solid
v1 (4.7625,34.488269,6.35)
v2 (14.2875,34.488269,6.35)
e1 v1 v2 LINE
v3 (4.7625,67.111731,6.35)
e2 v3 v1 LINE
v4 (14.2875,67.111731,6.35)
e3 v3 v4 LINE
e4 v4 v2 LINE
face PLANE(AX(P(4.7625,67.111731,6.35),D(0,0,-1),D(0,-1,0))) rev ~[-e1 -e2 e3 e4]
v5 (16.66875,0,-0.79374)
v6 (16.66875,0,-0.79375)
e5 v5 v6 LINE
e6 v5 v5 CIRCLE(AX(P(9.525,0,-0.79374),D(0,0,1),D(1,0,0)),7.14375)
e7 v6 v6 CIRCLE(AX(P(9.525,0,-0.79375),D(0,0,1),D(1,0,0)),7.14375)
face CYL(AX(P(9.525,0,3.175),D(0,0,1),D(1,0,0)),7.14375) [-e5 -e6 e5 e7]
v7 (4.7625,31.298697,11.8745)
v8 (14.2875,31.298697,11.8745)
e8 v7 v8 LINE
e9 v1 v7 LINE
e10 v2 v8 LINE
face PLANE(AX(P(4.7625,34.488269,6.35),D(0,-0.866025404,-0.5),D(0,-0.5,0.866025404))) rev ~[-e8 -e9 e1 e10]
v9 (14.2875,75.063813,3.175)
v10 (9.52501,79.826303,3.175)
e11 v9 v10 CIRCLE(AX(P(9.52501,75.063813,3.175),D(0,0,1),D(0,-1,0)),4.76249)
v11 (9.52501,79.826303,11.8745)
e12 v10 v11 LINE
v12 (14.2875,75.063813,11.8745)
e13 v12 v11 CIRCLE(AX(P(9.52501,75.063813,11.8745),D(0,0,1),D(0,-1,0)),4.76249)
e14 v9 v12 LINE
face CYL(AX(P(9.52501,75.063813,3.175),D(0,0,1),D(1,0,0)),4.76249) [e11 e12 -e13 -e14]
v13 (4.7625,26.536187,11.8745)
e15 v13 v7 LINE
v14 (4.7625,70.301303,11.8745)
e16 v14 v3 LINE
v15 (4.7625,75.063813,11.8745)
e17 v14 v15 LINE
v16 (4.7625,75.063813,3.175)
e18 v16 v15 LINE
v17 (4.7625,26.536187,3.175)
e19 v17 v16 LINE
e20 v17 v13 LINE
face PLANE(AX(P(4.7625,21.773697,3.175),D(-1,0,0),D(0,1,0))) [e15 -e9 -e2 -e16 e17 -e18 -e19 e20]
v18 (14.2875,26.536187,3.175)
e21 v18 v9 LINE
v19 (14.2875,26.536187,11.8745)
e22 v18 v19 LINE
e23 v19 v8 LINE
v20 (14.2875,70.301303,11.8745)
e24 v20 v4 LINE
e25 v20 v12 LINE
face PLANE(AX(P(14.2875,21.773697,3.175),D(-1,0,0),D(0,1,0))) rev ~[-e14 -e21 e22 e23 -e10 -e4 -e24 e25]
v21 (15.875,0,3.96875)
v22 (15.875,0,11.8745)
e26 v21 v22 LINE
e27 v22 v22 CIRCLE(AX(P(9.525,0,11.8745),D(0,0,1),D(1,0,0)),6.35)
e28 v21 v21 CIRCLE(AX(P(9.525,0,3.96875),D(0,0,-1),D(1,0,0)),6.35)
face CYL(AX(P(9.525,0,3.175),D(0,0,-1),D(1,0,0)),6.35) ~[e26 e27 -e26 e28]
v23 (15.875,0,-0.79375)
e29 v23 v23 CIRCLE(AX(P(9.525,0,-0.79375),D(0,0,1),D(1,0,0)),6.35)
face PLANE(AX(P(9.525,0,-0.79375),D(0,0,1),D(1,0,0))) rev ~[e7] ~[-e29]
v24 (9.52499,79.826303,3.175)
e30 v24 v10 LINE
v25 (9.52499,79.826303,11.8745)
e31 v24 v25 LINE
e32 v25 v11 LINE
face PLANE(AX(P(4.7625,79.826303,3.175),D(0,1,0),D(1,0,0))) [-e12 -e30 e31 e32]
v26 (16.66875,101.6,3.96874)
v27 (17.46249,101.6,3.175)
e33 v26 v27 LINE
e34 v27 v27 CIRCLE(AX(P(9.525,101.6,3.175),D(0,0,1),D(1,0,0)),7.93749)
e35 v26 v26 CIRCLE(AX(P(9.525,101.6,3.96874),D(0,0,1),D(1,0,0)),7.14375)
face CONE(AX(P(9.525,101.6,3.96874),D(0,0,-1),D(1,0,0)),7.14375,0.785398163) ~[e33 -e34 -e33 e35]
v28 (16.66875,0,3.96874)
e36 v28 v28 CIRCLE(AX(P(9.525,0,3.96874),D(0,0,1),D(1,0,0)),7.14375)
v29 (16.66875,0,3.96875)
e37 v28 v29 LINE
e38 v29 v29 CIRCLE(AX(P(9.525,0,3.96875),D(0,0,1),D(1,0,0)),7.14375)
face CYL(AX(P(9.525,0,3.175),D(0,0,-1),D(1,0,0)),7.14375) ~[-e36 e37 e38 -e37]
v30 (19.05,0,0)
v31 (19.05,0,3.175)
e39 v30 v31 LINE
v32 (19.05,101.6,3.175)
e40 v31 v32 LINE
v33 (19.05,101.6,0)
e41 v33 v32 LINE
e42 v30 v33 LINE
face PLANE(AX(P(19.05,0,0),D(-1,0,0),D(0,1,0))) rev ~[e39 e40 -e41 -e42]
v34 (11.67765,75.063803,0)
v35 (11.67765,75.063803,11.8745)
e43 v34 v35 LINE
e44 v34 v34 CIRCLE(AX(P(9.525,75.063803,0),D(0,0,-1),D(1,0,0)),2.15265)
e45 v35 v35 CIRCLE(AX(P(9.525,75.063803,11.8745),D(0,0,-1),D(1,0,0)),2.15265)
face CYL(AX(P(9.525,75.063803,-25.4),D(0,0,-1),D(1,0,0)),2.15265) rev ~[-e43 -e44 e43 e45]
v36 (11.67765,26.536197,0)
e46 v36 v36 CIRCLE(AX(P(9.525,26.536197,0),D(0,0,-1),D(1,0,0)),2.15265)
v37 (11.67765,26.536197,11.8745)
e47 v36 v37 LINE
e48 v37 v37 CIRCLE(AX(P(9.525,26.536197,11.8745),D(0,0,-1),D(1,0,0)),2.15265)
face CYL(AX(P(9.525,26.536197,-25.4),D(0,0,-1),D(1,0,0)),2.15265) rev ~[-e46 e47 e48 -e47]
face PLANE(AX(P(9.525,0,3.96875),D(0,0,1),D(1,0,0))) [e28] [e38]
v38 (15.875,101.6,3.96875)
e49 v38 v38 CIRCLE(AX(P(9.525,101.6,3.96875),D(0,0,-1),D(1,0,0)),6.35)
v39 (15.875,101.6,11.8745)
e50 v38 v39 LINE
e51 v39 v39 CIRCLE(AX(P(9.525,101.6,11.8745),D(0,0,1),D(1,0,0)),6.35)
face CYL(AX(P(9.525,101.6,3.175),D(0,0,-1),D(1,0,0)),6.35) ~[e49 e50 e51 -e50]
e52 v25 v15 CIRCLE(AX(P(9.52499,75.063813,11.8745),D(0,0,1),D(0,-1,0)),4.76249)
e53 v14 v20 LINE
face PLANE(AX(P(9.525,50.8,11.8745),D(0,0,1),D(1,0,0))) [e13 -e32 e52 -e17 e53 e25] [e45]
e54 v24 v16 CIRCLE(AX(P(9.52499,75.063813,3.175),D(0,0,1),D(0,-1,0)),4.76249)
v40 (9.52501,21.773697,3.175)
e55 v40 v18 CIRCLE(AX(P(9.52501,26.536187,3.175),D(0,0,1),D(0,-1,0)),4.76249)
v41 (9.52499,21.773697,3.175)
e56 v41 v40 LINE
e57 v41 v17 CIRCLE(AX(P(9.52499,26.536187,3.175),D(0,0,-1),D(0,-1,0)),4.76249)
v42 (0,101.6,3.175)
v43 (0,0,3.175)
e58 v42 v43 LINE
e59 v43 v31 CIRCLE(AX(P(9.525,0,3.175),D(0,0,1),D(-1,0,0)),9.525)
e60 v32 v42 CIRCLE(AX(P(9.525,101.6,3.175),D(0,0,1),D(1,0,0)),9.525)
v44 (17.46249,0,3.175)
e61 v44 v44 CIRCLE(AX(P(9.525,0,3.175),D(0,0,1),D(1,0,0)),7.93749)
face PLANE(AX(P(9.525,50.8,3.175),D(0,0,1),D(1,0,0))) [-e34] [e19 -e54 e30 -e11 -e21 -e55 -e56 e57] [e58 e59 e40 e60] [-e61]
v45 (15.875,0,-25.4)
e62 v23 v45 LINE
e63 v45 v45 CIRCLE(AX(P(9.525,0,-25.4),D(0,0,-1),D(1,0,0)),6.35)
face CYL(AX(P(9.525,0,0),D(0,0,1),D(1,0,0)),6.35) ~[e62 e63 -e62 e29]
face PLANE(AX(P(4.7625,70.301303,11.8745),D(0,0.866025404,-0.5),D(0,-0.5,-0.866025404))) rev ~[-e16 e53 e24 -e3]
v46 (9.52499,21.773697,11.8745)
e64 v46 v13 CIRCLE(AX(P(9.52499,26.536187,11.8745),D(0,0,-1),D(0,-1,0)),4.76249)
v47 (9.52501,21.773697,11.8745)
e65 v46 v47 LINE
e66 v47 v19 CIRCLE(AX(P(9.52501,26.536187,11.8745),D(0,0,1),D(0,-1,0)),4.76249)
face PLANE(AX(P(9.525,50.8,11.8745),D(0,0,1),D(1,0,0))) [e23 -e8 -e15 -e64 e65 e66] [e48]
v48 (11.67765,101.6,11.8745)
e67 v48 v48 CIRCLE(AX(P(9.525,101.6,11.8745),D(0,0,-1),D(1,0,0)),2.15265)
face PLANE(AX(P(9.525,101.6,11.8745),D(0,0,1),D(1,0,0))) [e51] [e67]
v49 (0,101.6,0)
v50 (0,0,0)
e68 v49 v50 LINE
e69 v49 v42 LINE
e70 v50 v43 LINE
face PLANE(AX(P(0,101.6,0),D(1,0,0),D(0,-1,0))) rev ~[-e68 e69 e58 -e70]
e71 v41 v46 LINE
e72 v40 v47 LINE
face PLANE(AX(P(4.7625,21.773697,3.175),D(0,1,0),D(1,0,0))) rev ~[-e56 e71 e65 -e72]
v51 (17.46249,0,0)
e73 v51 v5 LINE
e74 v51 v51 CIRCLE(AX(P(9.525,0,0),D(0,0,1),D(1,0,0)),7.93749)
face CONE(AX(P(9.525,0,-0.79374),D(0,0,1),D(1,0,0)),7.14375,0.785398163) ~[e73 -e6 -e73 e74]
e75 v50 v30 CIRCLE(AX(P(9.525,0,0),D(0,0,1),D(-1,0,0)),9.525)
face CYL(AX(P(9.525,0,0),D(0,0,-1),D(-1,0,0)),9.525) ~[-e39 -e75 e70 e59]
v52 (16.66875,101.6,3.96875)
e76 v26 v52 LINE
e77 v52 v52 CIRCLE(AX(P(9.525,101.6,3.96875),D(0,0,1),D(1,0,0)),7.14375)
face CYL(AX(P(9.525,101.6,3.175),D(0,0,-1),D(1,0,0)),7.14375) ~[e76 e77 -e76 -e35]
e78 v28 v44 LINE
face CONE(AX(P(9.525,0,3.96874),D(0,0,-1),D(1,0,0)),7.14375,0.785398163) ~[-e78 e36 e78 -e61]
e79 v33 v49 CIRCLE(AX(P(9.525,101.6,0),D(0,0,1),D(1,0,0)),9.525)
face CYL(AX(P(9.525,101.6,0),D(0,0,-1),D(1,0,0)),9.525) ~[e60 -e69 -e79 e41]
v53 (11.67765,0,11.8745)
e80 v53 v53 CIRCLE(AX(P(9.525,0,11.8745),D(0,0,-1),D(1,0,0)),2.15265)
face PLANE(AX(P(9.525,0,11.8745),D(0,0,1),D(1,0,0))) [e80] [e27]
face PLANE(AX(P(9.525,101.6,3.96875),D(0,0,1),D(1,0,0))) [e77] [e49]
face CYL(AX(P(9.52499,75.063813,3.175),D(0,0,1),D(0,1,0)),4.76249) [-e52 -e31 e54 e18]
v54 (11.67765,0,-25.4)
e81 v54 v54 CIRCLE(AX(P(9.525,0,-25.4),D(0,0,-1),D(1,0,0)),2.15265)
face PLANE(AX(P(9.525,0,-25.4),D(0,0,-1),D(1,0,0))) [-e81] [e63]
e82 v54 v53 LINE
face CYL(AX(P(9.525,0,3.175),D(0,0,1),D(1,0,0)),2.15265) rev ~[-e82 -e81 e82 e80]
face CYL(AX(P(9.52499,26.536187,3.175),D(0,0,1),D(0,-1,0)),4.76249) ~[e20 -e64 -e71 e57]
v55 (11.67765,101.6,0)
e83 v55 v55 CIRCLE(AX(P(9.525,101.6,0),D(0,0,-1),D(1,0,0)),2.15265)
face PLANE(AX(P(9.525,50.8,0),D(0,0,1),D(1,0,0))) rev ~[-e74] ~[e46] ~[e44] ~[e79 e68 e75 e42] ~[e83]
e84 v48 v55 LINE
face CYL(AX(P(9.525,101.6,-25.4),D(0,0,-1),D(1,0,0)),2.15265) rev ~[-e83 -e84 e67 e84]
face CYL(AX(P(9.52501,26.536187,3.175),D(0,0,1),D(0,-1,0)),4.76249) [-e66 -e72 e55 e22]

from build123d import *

# Parameters (mm, degrees)
F1_DEPTH       = 3.175
F2_W           = 9.525
F2_H           = 58.0526056528
F2_R           = 6.35
F3_DEPTH       = 8.6995
F5_DEPTH       = 9.525
F6_R           = 4.76249
F7_R           = 6.35
F8_DEPTH       = 25.4
F9_R           = 2.15265
F10_DEPTH      = 37.2745
F11_R          = 7.14375
F11_R_2        = 2.15265
F12_DEPTH      = 0.79375
F12_DEPTH_BACK = 3.96875
F13_R          = 7.14375
F13_R_2        = 2.15265
F14_DEPTH      = 0.79375
F15_SIZE       = 0.79374


# Not quite as in the source:
# - a fillet or chamfer is up to 0.001 mm smaller than in the source, because OpenCascade refuses the exact size


with BuildPart() as f1:
    # F0 (on Top) → F1 (new body)
    with BuildSketch(Plane.XY):
        with BuildLine():
            Line((0, 101.6), (0, 0))
            ThreePointArc((0, 0), (9.525, -9.525), (19.05, 0))
            Line((19.05, 0), (19.05, 101.6))
            ThreePointArc((19.05, 101.6), (9.525, 111.125), (0, 101.6))
        make_face()
    extrude(amount=F1_DEPTH)

    # F2 (on face) → F3 (join)
    with BuildSketch(Plane.XY.offset(3.175)):
        with Locations((9.525, 50.8)):
            Rectangle(F2_W, F2_H)
        with Locations((9.525, 0)):
            Circle(F2_R)
        with Locations((9.525, 101.6)):
            Circle(F2_R)
    extrude(amount=F3_DEPTH)

    # F4 (on face) → F5 (cut, through all)
    with BuildSketch(Plane(origin=(4.7625, 0, 0), x_dir=(0, -1, 0), z_dir=(-1, 0, 0))):
        Polygon((-34.4882687357, 6.35), (-31.2986971736, 11.8745), (-70.3013028264, 11.8745), (-67.1117312643, 6.35), align=None)
    extrude(amount=-F5_DEPTH, mode=Mode.SUBTRACT)

    # F6 (radius 4.7625 in the source; OpenCascade refuses exactly that, so slightly less here)
    f6_edges = [f1.edges().sort_by_distance(p)[0] for p in [
        (4.7625, 79.826303, 7.52475),
        (14.2875, 79.826303, 7.52475),
        (4.7625, 21.773697, 7.52475),
        (14.2875, 21.773697, 7.52475),
    ]]
    fillet(f6_edges, radius=F6_R)

    # F7 (on face) → F8 (join)
    with BuildSketch(Plane(origin=(0, 0, 0), x_dir=(1, 0, 0), z_dir=(0, 0, -1))):
        with Locations((9.525, 0)):
            Circle(F7_R)
    extrude(amount=F8_DEPTH)

    # F9 (on face) → F10 (cut, through all)
    with BuildSketch(Plane(origin=(0, 0, -25.4), x_dir=(1, 0, 0), z_dir=(0, 0, -1))):
        with Locations((9.525, 0)):
            Circle(F9_R)
        with Locations((9.525, -26.5361971736)):
            Circle(F9_R)
        with Locations((9.525, -75.0638028264)):
            Circle(F9_R)
        with Locations((9.525, -101.6)):
            Circle(F9_R)
    extrude(amount=-F10_DEPTH, mode=Mode.SUBTRACT)

    # F11 (on face) → F12 (join, two sides)
    with BuildSketch(Plane.XY.offset(3.175)) as f12_sk:
        with Locations((9.525, 0)):
            Circle(F11_R)
        with Locations((9.525, 0)):
            Circle(F11_R_2, mode=Mode.SUBTRACT)
    extrude(amount=F12_DEPTH)
    extrude(f12_sk.sketch, amount=-F12_DEPTH_BACK)

    # F13 (on face) → F14 (join, through all)
    with BuildSketch(Plane.XY.offset(3.175)):
        with Locations((9.525, 101.6)):
            Circle(F13_R)
        with Locations((9.525, 101.6)):
            Circle(F13_R_2, mode=Mode.SUBTRACT)
    extrude(amount=F14_DEPTH)

    # F15 (size 0.79375 in the source; OpenCascade refuses exactly that, so slightly less here)
    f15_edges = [f1.edges().sort_by_distance(p)[0] for p in [
        (2.38125, 101.6, 3.175),
        (2.38125, 0, 0),
        (2.38125, 0, 3.175),
    ]]
    chamfer(f15_edges, length=F15_SIZE)


solid = f1.part
